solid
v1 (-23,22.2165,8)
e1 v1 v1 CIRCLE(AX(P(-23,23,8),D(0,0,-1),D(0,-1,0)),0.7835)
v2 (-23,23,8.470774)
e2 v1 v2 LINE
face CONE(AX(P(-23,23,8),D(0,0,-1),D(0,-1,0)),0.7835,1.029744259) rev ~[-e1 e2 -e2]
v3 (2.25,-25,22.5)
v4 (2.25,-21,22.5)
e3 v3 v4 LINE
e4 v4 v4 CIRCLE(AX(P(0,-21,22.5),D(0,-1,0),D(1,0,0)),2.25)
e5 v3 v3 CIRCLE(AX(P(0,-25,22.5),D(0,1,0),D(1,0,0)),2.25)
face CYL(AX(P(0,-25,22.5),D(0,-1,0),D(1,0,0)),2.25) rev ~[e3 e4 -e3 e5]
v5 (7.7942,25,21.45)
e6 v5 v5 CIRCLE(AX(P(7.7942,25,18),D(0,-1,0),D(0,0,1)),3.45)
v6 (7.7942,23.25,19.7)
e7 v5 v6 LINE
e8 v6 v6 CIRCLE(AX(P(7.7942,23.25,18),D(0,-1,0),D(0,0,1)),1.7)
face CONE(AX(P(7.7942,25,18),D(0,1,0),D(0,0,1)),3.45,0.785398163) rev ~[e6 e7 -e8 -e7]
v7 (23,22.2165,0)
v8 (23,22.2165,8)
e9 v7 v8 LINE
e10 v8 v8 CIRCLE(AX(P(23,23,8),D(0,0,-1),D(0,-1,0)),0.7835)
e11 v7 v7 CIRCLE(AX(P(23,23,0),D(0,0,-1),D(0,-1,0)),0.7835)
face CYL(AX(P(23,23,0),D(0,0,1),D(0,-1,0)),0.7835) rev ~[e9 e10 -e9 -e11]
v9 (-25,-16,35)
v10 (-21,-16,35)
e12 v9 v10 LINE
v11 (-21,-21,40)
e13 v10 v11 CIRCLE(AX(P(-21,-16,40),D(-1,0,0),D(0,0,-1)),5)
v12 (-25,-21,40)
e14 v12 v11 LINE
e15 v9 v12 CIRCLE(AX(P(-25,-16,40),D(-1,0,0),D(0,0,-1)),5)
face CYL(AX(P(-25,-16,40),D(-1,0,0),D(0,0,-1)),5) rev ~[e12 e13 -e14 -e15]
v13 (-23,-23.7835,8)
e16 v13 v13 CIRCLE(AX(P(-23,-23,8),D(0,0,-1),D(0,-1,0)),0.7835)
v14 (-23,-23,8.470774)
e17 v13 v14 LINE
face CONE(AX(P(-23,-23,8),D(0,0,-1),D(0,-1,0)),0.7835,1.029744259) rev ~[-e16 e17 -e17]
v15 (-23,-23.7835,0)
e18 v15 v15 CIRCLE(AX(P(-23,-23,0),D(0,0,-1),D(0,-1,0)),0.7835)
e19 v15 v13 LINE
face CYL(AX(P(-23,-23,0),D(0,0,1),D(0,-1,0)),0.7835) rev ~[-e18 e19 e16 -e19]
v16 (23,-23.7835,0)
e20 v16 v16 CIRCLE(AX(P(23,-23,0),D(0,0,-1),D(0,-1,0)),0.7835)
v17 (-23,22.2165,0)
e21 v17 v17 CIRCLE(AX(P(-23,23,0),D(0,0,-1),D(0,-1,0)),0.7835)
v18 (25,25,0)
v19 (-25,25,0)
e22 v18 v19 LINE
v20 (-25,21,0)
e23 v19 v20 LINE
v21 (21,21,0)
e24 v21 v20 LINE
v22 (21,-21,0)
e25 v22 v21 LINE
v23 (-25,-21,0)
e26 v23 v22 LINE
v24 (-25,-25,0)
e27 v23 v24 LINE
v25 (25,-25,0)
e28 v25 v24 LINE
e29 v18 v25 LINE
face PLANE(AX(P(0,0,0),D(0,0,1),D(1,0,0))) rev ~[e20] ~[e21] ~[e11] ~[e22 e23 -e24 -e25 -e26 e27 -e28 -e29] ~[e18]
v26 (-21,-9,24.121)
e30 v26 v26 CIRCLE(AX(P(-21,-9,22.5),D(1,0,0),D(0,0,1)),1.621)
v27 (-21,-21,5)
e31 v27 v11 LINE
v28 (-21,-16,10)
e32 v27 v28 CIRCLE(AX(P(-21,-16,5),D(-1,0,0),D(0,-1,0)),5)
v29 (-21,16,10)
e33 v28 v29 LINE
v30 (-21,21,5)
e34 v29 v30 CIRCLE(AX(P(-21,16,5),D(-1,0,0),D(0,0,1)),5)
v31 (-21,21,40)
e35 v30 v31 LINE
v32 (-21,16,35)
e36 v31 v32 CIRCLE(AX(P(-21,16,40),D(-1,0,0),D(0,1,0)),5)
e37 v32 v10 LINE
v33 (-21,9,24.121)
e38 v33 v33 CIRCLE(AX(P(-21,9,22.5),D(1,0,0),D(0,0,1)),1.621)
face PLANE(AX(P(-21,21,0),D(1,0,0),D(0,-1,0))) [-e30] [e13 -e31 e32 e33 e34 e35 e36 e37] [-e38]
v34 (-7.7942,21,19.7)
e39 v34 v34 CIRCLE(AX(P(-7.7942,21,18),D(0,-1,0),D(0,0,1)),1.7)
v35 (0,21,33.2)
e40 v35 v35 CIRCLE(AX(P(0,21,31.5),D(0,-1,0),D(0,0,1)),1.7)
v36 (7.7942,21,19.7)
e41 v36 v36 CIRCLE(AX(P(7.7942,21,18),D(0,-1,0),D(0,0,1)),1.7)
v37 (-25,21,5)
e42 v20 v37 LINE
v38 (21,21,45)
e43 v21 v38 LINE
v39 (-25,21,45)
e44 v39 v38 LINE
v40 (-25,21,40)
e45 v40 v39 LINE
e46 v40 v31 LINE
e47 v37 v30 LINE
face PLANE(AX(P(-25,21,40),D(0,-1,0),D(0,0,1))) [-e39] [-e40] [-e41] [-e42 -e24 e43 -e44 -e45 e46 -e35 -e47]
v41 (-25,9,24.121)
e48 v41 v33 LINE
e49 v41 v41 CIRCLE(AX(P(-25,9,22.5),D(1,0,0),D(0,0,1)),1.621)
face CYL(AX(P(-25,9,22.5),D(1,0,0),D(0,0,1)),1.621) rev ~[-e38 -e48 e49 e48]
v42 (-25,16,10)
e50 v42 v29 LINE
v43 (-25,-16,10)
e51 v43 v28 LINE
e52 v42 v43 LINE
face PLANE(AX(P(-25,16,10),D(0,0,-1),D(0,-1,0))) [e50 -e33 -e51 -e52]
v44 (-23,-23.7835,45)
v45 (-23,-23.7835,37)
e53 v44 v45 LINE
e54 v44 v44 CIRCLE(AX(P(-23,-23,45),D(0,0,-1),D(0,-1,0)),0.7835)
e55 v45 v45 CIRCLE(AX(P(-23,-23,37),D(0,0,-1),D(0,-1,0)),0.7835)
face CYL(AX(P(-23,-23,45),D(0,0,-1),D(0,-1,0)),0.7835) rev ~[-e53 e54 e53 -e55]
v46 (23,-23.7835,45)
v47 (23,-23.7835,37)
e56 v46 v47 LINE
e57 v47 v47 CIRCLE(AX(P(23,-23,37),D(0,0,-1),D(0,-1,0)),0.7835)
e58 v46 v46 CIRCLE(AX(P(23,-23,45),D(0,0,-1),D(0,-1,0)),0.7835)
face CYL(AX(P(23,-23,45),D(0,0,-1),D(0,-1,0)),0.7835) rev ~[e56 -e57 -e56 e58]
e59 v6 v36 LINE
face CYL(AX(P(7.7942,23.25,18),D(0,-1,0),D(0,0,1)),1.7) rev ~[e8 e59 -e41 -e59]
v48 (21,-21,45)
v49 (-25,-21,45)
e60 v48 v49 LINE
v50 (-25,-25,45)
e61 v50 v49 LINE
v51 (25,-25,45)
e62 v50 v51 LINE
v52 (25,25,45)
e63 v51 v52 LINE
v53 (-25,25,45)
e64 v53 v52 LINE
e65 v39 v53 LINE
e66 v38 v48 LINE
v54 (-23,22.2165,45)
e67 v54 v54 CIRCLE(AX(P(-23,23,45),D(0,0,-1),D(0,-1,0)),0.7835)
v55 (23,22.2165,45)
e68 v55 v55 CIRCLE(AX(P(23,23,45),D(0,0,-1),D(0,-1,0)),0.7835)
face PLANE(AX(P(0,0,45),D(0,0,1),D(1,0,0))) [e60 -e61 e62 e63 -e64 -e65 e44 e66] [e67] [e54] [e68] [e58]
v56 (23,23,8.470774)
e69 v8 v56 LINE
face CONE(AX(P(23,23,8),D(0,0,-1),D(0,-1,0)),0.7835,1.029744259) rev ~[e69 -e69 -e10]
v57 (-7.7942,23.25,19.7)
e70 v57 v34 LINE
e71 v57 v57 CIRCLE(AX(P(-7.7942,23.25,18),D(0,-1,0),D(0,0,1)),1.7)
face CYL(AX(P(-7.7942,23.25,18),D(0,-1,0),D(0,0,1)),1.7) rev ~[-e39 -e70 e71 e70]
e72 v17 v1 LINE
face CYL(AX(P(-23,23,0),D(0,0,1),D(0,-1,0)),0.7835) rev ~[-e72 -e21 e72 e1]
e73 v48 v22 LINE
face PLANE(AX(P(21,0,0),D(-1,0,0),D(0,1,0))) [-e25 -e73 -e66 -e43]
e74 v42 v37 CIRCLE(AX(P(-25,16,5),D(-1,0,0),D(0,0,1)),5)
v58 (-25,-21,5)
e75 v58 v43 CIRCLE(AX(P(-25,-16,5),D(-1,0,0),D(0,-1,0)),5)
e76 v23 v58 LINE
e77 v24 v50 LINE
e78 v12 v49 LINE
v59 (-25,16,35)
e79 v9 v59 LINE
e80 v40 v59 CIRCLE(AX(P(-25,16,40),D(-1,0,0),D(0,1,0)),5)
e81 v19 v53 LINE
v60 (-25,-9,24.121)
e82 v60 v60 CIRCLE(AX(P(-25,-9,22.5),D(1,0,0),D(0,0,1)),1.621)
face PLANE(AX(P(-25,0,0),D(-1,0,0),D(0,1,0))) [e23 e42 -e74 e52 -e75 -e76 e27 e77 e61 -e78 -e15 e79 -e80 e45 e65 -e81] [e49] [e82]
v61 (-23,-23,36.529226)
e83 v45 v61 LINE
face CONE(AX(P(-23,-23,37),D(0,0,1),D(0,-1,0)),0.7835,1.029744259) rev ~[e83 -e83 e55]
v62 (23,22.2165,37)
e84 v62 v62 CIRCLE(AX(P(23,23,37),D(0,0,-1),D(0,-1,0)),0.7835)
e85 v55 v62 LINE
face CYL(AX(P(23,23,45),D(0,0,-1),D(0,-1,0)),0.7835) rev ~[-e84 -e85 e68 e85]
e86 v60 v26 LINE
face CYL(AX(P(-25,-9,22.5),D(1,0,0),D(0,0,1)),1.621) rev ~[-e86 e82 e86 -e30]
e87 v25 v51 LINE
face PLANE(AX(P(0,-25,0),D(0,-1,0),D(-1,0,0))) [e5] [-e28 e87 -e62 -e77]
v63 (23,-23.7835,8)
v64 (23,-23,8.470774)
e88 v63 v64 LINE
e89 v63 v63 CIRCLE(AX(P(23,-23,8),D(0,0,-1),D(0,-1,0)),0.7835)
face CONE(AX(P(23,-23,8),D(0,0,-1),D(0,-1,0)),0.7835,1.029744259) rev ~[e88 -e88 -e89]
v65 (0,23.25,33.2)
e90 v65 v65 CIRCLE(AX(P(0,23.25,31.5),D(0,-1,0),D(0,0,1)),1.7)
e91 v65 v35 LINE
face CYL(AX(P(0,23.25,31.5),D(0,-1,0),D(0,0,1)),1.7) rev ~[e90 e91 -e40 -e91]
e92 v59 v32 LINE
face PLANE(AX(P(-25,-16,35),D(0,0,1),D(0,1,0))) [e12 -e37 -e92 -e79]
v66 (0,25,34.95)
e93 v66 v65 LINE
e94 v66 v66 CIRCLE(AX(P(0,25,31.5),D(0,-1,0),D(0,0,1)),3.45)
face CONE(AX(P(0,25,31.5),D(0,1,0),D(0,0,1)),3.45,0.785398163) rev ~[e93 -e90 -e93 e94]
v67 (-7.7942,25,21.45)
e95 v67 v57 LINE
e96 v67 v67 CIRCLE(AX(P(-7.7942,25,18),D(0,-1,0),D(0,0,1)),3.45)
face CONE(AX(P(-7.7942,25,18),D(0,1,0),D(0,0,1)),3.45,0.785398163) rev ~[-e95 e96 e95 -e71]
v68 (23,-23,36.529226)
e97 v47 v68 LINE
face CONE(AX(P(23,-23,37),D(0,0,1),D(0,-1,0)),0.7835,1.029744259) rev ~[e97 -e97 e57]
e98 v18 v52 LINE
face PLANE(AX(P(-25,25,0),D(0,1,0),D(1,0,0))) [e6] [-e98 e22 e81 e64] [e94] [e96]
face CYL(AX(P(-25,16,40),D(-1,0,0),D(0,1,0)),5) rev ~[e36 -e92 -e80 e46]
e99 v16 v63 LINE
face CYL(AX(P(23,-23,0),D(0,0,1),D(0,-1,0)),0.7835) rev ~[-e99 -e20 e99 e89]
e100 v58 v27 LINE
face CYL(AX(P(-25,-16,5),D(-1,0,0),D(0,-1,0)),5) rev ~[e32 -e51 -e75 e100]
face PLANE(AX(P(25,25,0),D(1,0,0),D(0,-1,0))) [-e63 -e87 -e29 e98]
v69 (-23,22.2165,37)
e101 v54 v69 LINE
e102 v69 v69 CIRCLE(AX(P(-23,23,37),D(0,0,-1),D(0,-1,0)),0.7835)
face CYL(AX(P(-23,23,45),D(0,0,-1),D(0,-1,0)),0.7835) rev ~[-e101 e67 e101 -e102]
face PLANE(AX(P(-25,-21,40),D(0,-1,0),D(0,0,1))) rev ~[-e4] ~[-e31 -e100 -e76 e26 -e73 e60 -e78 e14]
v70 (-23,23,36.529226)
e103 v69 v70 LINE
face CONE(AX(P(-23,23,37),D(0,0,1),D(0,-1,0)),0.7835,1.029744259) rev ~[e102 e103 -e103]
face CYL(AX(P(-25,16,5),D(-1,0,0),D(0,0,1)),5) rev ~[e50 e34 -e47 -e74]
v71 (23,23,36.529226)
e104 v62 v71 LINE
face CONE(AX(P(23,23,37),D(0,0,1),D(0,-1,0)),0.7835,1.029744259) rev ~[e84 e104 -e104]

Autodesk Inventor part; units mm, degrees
ref_plane "YZ Plane" through (0, 0, 0) normal (1, 0, 0) x (0, 1, 0)
ref_plane "XZ Plane" through (0, 0, 0) normal (0, 1, 0) x (-1, 0, 0)
sketch "Skizze1" plane through (0, 0, 0) normal (0, 0, 1) x (1, 0, 0)
  line L0 (-25, 25) -> (25, 25)
  line L1 (25, 25) -> (25, -25)
  line L2 (25, -25) -> (-25, -25)
  line L3 (-25, -25) -> (-25, 25)
  line L4 (-35, 0) -> (35, 0) projected
  line L5 (0, -35) -> (0, 35) projected
  line L6 (21, 21) -> (-21, 21)
  line L7 (-21, 21) -> (-21, -21)
  line L8 (-21, -21) -> (21, -21)
  line L9 (21, -21) -> (21, 21)
  point P0 (0, 0)
  dimension "d0" = 50
  dimension "d1" = 50
  dimension "d2" = 4
extrude "Extrusion1" add sketch "Skizze1" along normal blind 45 contours L0 L5 L6 L7 L4 L3 | L0 L1 L4 L9 L6 L5 | L4 L7 L8 L5 L2 L3 | L1 L2 L5 L8 L9 L4
sketch "Skizze2" plane through (-25, -25, 0) normal (-1, 0, 0) x (0, 0, 1)
  line L0 (0, 50) -> (45, 50) projected
  line L1 (0, 0) -> (45, 0) projected
  line L2 (22.5, 50) -> (22.5, 0)
  line L3 (0, 46) -> (45, 46) projected
  line L4 (0, 4) -> (45, 4) projected
  line L5 (0, 46) -> (5, 46)
  line L6 (10, 41) -> (10, 9)
  line L7 (5, 4) -> (0, 4)
  line L8 (0, 4) -> (0, 46)
  line L9 (45, 4) -> (40, 4)
  line L10 (35, 9) -> (35, 41)
  line L11 (40, 46) -> (45, 46)
  line L12 (45, 46) -> (45, 4)
  arc A0 (40, 46) -> (35, 41) centre (40, 41) ccw
  arc A1 (35, 9) -> (40, 4) centre (40, 9) ccw
  arc A2 (5, 4) -> (10, 9) centre (5, 9) ccw
  arc A3 (10, 41) -> (5, 46) centre (5, 41) ccw
  point P0 (0, 25)
  point P1 (10, 4)
  point P2 (35, 46)
  dimension "d5" = 25
  dimension "d6" = 5
extrude "Extrusion2" cut sketch "Skizze2" against normal up to surface (46 mm away) contours A3 L6 A2 L4 L8 L3 | L3 L12 L4 A1 L10 A0
sketch "Skizze3" plane through (-25, 25, 0) normal (0, 1, 0) x (1, 0, 0)
  line L0 (0, -45) -> (50, -45) projected
  line L1 (50, 0) -> (50, -45) projected
  line L2 (0, 0) -> (0, -45) projected
  line L3 (50, -22.5) -> (0, -22.5)
  line L4 (25, -45) -> (25, 0)
  circle A0 centre (25, -22.5) radius 9
  line L5 (25, -22.5) -> (17.2058, -18)
  line L6 (25, -22.5) -> (32.7942, -18)
  point P0 (25, -31.5)
  dimension "d9" = 18
  dimension "d10" = 120
  dimension "d11" = 120
hole "Bohrung1" at (0, 25, 31.5) at (-7.7942, 25, 18) at (7.7942, 25, 18) direction (0, -1, 0) diameter 3.4 end up to surface countersink diameter 6.9 countersink angle 90
sketch "Skizze4" plane through (-25, -25, 0) normal (0, -1, 0) x (1, 0, 0)
  line L0 (50, 45) -> (0, 45) projected
  line L1 (0, 0) -> (0, 45) projected
  line L2 (50, 0) -> (50, 45) projected
  line L3 (0, 22.5) -> (50, 22.5)
  line L4 (25, 45) -> (25, 0)
  circle A0 centre (25, 22.5) radius 2.25
  dimension "d19" = 4.5
extrude "Extrusion3" cut sketch "Skizze4" against normal up to surface (46 mm away) contours A0 L3 L4 | L4 L3 A0 | A0 L4 L3 | L4 A0 L3
sketch "Skizze5" plane through (-25, 21, 0) normal (-1, 0, 0) x (0, 0, 1)
  circle A0 centre (22.5, -30) radius 2.25 projected
  circle A1 centre (22.5, -12) radius 2.25 projected
  line L0 (35, -35) -> (35, -6) projected
  line L1 (10, -6) -> (35, -6) projected
  line L2 (10, -6) -> (10, -35) projected
  arc A2 (5, -40) -> (10, -35) centre (5, -35) ccw projected
  line L3 (5, -40) -> (40, -40) projected
  arc A3 (35, -35) -> (40, -40) centre (40, -35) ccw projected
  point P0 (0, -21)
hole "Bohrung2" at (-25, 9, 22.5) at (-25, -9, 22.5) direction (1, 0, 0) diameter 3.242 end up to surface thread size "M4x0.7" class "6H" standard "ISO Metric profile"
sketch "Skizze6" plane through (0, 0, 45) normal (0, 0, 1) x (1, 0, 0)
  line L0 (-25, -25) -> (-25, -21) projected
  line L1 (25, -25) -> (-25, -25) projected
  line L2 (25, 25) -> (25, -25) projected
  line L3 (-25, 25) -> (25, 25) projected
  line L4 (-25, 21) -> (-25, 25) projected
  line L5 (-25, 23) -> (25, 23)
  line L6 (23, 25) -> (23, -25)
  line L7 (-25, -23) -> (25, -23)
  line L8 (-23, 25) -> (-23, -25)
  point P0 (0, 0)
  point P1 (-23, 23)
  point P2 (23, 23)
  point P3 (23, -23)
  point P4 (-23, -23)
  dimension "d29" = 2
  dimension "d30" = 2
hole "Bohrung3" at (-23, 23, 45) at (23, 23, 45) at (23, -23, 45) at (-23, -23, 45) direction (0, 0, -1) diameter 1.567 depth 8 tip angle 118 thread size "M2x0.4" class "6H" standard "ISO Metric profile"
ref_plane "Arbeitsebene1" through (0, 0, 22.5) normal (0, 0, 1) x (1, 0, 0)
mirror "Spiegeln1" about plane through (0, 0, 22.5) normal (0, 0, 1) of "Bohrung3"
properties part number "1_0204_001"
